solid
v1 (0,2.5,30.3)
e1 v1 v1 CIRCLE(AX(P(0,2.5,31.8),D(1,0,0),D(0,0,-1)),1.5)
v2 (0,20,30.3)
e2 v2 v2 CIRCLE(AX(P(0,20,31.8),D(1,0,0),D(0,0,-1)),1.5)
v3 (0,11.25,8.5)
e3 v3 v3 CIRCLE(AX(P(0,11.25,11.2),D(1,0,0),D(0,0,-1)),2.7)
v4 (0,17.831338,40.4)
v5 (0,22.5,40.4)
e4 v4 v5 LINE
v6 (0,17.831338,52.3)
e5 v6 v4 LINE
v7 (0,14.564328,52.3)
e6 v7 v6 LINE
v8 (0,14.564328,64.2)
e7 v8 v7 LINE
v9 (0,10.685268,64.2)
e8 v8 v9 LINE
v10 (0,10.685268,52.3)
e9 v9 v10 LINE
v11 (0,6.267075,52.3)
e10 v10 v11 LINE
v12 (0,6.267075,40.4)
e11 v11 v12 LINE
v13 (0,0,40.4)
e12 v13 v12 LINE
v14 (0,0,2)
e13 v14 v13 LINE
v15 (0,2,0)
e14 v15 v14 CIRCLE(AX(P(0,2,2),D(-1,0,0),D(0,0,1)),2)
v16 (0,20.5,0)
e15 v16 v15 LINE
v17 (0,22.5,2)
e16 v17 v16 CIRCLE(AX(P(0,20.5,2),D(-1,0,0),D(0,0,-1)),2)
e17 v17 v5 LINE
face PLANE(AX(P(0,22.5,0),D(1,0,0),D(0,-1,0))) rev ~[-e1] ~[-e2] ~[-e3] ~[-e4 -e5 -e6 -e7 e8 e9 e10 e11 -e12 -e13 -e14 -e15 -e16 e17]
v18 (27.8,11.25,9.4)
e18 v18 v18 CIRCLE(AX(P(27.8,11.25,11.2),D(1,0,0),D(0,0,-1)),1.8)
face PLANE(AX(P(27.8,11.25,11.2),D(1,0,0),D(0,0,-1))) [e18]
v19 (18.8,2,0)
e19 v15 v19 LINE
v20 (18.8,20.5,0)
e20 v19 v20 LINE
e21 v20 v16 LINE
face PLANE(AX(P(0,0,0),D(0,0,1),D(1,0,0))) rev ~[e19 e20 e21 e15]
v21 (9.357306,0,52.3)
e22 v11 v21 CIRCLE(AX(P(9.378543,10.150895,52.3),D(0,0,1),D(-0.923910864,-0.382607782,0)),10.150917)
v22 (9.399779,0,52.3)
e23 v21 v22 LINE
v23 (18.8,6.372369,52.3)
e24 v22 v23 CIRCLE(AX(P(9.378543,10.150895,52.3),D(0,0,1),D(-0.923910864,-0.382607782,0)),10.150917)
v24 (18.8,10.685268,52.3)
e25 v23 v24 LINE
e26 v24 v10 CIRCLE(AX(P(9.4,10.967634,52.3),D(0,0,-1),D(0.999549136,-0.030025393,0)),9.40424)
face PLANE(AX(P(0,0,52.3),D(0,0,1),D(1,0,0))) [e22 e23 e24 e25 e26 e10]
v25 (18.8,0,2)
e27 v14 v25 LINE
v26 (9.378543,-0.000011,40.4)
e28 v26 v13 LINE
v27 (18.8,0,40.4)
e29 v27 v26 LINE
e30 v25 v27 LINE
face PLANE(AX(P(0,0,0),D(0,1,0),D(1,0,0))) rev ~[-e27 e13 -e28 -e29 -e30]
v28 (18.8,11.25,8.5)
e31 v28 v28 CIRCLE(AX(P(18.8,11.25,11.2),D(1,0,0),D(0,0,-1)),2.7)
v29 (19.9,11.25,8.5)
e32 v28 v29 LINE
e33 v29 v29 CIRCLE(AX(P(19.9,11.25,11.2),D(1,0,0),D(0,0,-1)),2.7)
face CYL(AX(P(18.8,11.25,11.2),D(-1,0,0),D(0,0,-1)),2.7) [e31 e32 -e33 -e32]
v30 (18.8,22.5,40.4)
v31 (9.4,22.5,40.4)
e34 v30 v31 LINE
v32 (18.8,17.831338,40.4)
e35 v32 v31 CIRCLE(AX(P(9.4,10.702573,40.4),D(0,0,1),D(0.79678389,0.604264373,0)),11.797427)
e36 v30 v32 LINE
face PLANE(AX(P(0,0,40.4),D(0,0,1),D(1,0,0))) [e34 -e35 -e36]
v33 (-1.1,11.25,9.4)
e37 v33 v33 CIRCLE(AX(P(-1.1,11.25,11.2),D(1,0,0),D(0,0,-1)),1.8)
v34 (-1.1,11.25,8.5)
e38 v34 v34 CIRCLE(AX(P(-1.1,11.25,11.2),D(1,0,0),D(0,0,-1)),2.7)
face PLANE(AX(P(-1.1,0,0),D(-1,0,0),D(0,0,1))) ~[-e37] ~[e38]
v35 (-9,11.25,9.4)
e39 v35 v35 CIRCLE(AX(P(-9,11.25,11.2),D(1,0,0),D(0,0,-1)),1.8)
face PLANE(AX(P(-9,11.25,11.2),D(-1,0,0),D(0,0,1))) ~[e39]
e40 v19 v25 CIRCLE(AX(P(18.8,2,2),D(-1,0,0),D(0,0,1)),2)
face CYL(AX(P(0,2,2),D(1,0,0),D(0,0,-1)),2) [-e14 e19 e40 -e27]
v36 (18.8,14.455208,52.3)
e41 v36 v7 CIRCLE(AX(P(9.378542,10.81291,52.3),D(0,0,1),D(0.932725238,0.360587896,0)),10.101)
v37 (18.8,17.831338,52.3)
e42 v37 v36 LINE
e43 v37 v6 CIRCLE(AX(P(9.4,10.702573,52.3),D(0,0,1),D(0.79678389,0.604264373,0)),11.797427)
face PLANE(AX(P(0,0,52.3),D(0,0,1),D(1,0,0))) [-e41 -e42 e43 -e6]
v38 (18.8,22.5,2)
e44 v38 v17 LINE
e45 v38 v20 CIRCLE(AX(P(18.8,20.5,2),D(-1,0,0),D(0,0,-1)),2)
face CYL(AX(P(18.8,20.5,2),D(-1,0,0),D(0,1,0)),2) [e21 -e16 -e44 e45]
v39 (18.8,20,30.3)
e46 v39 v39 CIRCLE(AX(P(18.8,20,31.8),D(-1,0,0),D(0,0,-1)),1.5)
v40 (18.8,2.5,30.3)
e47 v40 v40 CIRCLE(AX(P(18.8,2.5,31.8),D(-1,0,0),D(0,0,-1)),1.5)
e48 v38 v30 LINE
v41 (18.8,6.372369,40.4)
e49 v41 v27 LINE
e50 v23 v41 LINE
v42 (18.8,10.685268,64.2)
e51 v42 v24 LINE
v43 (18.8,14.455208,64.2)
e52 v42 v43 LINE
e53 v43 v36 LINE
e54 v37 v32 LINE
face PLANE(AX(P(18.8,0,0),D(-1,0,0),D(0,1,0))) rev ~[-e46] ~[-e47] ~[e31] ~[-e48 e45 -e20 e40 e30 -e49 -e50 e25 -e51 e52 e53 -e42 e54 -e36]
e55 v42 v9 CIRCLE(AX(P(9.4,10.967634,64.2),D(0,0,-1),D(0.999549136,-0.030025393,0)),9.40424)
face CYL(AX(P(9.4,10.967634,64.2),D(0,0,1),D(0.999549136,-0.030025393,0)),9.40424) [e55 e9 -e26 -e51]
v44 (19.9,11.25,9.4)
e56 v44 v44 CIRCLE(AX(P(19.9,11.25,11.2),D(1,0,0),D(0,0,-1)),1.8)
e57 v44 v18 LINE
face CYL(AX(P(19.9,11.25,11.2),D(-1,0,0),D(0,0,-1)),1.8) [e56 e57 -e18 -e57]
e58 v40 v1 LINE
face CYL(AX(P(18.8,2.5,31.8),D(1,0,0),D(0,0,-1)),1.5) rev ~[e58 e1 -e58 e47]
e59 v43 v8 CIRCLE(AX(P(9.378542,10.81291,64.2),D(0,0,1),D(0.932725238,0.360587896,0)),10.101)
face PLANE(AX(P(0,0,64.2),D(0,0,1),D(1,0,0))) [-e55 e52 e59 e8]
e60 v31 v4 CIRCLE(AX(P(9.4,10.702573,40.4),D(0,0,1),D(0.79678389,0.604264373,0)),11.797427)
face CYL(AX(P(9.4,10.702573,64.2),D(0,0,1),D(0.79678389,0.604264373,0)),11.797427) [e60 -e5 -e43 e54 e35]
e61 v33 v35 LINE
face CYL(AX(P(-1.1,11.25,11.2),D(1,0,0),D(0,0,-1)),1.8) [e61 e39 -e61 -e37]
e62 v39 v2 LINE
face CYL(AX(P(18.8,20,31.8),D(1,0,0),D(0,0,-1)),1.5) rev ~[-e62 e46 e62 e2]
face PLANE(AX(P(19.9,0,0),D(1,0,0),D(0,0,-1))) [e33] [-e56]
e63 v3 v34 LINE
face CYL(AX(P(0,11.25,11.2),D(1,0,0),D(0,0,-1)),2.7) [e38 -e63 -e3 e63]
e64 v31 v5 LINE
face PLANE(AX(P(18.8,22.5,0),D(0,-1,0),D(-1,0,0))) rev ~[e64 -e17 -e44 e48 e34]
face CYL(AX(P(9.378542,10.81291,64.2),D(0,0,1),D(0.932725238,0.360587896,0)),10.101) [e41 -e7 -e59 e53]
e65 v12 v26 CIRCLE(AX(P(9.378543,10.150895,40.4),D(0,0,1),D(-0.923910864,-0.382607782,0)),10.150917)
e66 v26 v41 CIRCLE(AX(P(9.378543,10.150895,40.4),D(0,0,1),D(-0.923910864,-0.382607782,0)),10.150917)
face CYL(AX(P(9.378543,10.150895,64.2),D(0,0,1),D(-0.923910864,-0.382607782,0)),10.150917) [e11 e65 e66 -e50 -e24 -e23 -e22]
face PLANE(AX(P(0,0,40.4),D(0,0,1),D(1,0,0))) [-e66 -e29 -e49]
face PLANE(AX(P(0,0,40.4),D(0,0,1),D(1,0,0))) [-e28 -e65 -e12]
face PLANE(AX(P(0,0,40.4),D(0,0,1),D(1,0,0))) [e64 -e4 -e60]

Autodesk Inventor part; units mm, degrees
ref_plane "YZ Plane" through (0, 0, 0) normal (1, 0, 0) x (0, 1, 0)
ref_plane "XZ Plane" through (0, 0, 0) normal (0, 1, 0) x (-1, 0, 0)
sketch "Esboço1" plane through (0, 0, 0) normal (0, 0, 1) x (1, 0, 0)
  line L0 (0, 0) -> (18.8, 0)
  line L1 (18.8, 0) -> (18.8, 22.5)
  line L2 (18.8, 22.5) -> (0, 22.5)
  line L3 (0, 22.5) -> (0, 0)
  dimension "d0" = 18.8
  dimension "d1" = 22.5
extrude "Extrusão1" add sketch "Esboço1" along normal blind 64.2
sketch "Esboço2" plane through (18.8, 0, 0) normal (1, 0, 0) x (0, 0, -1)
  line L0 (0, 0) -> (-64.2, 0) projected
  line L1 (0, 0) -> (0, 11.25)
  line L2 (0, 0) -> (0, 22.5) projected
  line L3 (0, 11.25) -> (-11.2, 11.25)
  circle A0 centre (-11.2, 11.25) radius 2.7
  dimension "d4" = 11.25
  dimension "d5" = 11.2
  dimension "d6" = 5.4
extrude "Extrusão2" add sketch "Esboço2" along normal blind 1.1
sketch "Esboço3" plane through (19.9, 11.25, 11.2) normal (1, 0, 0) x (0, 0, -1)
  circle A0 centre (0, 0) radius 1.8
  point P0 (11.2, -11.25)
  dimension "d9" = 3.6
extrude "Extrusão3" add sketch "Esboço3" along normal blind 7.9
ref_plane "Plano de trabalho1" through (9.4, 0, 0) normal (1, 0, 0) x (0, 0, -1)
mirror "Espelhamento1" about plane through (9.4, 0, 0) normal (1, 0, 0) of "Extrusão3", "Extrusão2"
fillet "Arredondamento1" radius 2 1 edges at (9.4, 22.5, 0)
fillet "Arredondamento2" radius 2 1 edges at (9.4, 0, 0)
sketch "Esboço4" plane through (18.8, 0, 64.2) normal (1, 0, 0) x (0, 0, -1)
  line L0 (64.2, 0) -> (32.4, 0)
  line L1 (62.2, 0) -> (0, 0) projected
  line L2 (32.4, 0) -> (32.4, 2.5)
  circle A0 centre (32.4, 2.5) radius 1.5
  line L3 (32.4, 2.5) -> (32.4, 20)
  circle A1 centre (32.4, 20) radius 1.5
  dimension "d15" = 31.8
  dimension "d16" = 2.5
  dimension "d17" = 3
  dimension "d18" = 17.5
  dimension "d19" = 3
extrude "Extrusão4" cut sketch "Esboço4" against normal through all
sketch "Esboço5" plane through (0, 0, 64.2) normal (0, 0, 1) x (1, 0, 0)
  line L0 (18.8, 22.5) -> (0, 22.5)
  line L1 (0, 22.5) -> (18.8, 22.5)
  line L2 (18.8, 22.5) -> (18.8, 0)
  line L3 (18.8, 0) -> (0, 0)
  line L4 (0, 0) -> (0, 22.5)
  arc A0 (18.8, 17.831338) -> (0, 17.831338) centre (9.4, 10.702573) ccw
  point P0 (9.4, 22.5)
extrude "Extrusão5" cut sketch "Esboço5" against normal blind 23.8 contours L2 A0 L0 | A0 L4 L0
sketch "Esboço6" plane through (0, 0, 64.2) normal (0, 0, 1) x (1, 0, 0)
  line L0 (0, 22.508504) -> (18.8, 22.508504)
  line L1 (18.8, 22.508504) -> (18.8, 0)
  line L2 (18.8, 0) -> (0, 0)
  line L3 (0, 0) -> (0, 22.508504)
  arc A0 (0, 6.267075) -> (18.8, 6.372369) centre (9.378542, 10.150894) ccw
  point P0 (9.357085, 0)
  point P1 (9.4, 0)
extrude "Extrusão6" cut sketch "Esboço6" against normal blind 23.8 contours A0 L2 L3 | L1 L2 A0
sketch "Esboço7" plane through (0, 0, 64.2) normal (0, 0, 1) x (1, 0, 0)
  line L0 (0, 22.5) -> (9.4, 22.5)
  line L1 (0, 22.5) -> (18.8, 22.5)
  line L2 (18.8, 22.5) -> (18.8, 0)
  line L3 (18.8, 0) -> (0, 0)
  line L4 (0, 0) -> (0, 22.5)
  arc A0 (18.8, 14.455208) -> (0, 14.564328) centre (9.378542, 10.812909) ccw
extrude "Extrusão7" cut sketch "Esboço7" against normal blind 11.9 contours L0 L1 L2 A0 L4
sketch "Esboço9" plane through (0, 0, 64.2) normal (0, 0, 1) x (1, 0, 0)
  line L0 (0, 20.5) -> (0, 2)
  line L1 (18.8, 13.95) -> (18.8, 8.55)
  arc A0 (0, 11.25) -> (18.8, 11.25) centre (9.4, 10.967634) ccw
  line L2 (0, 20.5) -> (0, 22.5)
  line L3 (0, 22.5) -> (18.8, 22.5)
  line L4 (18.8, 22.5) -> (18.8, 0)
  line L5 (18.8, 0) -> (0, 0)
  line L6 (0, 0) -> (0, 22.5)
  point P0 (18.8, 10.685268)
  point P1 (0, 10.685268)
sketch "Esboço9 outline for Extrusão8" plane through (0, 0, 64.2) normal (0, 0, 1) x (1, 0, 0)
  line L0 (0, 0) -> (18.8, 0)
  line L1 (0, 2) -> (0, 0)
  line L2 (0, 10.685268) -> (0, 2)
  arc A0 (18.8, 10.685268) -> (0, 10.685268) centre (9.4, 10.967634) cw
  line L3 (18.8, 8.55) -> (18.8, 10.685268)
  line L4 (18.8, 0) -> (18.8, 8.55)
extrude "Extrusão8" cut sketch "Esboço9 outline for Extrusão8" against normal blind 11.9
properties part number "motorDC"
